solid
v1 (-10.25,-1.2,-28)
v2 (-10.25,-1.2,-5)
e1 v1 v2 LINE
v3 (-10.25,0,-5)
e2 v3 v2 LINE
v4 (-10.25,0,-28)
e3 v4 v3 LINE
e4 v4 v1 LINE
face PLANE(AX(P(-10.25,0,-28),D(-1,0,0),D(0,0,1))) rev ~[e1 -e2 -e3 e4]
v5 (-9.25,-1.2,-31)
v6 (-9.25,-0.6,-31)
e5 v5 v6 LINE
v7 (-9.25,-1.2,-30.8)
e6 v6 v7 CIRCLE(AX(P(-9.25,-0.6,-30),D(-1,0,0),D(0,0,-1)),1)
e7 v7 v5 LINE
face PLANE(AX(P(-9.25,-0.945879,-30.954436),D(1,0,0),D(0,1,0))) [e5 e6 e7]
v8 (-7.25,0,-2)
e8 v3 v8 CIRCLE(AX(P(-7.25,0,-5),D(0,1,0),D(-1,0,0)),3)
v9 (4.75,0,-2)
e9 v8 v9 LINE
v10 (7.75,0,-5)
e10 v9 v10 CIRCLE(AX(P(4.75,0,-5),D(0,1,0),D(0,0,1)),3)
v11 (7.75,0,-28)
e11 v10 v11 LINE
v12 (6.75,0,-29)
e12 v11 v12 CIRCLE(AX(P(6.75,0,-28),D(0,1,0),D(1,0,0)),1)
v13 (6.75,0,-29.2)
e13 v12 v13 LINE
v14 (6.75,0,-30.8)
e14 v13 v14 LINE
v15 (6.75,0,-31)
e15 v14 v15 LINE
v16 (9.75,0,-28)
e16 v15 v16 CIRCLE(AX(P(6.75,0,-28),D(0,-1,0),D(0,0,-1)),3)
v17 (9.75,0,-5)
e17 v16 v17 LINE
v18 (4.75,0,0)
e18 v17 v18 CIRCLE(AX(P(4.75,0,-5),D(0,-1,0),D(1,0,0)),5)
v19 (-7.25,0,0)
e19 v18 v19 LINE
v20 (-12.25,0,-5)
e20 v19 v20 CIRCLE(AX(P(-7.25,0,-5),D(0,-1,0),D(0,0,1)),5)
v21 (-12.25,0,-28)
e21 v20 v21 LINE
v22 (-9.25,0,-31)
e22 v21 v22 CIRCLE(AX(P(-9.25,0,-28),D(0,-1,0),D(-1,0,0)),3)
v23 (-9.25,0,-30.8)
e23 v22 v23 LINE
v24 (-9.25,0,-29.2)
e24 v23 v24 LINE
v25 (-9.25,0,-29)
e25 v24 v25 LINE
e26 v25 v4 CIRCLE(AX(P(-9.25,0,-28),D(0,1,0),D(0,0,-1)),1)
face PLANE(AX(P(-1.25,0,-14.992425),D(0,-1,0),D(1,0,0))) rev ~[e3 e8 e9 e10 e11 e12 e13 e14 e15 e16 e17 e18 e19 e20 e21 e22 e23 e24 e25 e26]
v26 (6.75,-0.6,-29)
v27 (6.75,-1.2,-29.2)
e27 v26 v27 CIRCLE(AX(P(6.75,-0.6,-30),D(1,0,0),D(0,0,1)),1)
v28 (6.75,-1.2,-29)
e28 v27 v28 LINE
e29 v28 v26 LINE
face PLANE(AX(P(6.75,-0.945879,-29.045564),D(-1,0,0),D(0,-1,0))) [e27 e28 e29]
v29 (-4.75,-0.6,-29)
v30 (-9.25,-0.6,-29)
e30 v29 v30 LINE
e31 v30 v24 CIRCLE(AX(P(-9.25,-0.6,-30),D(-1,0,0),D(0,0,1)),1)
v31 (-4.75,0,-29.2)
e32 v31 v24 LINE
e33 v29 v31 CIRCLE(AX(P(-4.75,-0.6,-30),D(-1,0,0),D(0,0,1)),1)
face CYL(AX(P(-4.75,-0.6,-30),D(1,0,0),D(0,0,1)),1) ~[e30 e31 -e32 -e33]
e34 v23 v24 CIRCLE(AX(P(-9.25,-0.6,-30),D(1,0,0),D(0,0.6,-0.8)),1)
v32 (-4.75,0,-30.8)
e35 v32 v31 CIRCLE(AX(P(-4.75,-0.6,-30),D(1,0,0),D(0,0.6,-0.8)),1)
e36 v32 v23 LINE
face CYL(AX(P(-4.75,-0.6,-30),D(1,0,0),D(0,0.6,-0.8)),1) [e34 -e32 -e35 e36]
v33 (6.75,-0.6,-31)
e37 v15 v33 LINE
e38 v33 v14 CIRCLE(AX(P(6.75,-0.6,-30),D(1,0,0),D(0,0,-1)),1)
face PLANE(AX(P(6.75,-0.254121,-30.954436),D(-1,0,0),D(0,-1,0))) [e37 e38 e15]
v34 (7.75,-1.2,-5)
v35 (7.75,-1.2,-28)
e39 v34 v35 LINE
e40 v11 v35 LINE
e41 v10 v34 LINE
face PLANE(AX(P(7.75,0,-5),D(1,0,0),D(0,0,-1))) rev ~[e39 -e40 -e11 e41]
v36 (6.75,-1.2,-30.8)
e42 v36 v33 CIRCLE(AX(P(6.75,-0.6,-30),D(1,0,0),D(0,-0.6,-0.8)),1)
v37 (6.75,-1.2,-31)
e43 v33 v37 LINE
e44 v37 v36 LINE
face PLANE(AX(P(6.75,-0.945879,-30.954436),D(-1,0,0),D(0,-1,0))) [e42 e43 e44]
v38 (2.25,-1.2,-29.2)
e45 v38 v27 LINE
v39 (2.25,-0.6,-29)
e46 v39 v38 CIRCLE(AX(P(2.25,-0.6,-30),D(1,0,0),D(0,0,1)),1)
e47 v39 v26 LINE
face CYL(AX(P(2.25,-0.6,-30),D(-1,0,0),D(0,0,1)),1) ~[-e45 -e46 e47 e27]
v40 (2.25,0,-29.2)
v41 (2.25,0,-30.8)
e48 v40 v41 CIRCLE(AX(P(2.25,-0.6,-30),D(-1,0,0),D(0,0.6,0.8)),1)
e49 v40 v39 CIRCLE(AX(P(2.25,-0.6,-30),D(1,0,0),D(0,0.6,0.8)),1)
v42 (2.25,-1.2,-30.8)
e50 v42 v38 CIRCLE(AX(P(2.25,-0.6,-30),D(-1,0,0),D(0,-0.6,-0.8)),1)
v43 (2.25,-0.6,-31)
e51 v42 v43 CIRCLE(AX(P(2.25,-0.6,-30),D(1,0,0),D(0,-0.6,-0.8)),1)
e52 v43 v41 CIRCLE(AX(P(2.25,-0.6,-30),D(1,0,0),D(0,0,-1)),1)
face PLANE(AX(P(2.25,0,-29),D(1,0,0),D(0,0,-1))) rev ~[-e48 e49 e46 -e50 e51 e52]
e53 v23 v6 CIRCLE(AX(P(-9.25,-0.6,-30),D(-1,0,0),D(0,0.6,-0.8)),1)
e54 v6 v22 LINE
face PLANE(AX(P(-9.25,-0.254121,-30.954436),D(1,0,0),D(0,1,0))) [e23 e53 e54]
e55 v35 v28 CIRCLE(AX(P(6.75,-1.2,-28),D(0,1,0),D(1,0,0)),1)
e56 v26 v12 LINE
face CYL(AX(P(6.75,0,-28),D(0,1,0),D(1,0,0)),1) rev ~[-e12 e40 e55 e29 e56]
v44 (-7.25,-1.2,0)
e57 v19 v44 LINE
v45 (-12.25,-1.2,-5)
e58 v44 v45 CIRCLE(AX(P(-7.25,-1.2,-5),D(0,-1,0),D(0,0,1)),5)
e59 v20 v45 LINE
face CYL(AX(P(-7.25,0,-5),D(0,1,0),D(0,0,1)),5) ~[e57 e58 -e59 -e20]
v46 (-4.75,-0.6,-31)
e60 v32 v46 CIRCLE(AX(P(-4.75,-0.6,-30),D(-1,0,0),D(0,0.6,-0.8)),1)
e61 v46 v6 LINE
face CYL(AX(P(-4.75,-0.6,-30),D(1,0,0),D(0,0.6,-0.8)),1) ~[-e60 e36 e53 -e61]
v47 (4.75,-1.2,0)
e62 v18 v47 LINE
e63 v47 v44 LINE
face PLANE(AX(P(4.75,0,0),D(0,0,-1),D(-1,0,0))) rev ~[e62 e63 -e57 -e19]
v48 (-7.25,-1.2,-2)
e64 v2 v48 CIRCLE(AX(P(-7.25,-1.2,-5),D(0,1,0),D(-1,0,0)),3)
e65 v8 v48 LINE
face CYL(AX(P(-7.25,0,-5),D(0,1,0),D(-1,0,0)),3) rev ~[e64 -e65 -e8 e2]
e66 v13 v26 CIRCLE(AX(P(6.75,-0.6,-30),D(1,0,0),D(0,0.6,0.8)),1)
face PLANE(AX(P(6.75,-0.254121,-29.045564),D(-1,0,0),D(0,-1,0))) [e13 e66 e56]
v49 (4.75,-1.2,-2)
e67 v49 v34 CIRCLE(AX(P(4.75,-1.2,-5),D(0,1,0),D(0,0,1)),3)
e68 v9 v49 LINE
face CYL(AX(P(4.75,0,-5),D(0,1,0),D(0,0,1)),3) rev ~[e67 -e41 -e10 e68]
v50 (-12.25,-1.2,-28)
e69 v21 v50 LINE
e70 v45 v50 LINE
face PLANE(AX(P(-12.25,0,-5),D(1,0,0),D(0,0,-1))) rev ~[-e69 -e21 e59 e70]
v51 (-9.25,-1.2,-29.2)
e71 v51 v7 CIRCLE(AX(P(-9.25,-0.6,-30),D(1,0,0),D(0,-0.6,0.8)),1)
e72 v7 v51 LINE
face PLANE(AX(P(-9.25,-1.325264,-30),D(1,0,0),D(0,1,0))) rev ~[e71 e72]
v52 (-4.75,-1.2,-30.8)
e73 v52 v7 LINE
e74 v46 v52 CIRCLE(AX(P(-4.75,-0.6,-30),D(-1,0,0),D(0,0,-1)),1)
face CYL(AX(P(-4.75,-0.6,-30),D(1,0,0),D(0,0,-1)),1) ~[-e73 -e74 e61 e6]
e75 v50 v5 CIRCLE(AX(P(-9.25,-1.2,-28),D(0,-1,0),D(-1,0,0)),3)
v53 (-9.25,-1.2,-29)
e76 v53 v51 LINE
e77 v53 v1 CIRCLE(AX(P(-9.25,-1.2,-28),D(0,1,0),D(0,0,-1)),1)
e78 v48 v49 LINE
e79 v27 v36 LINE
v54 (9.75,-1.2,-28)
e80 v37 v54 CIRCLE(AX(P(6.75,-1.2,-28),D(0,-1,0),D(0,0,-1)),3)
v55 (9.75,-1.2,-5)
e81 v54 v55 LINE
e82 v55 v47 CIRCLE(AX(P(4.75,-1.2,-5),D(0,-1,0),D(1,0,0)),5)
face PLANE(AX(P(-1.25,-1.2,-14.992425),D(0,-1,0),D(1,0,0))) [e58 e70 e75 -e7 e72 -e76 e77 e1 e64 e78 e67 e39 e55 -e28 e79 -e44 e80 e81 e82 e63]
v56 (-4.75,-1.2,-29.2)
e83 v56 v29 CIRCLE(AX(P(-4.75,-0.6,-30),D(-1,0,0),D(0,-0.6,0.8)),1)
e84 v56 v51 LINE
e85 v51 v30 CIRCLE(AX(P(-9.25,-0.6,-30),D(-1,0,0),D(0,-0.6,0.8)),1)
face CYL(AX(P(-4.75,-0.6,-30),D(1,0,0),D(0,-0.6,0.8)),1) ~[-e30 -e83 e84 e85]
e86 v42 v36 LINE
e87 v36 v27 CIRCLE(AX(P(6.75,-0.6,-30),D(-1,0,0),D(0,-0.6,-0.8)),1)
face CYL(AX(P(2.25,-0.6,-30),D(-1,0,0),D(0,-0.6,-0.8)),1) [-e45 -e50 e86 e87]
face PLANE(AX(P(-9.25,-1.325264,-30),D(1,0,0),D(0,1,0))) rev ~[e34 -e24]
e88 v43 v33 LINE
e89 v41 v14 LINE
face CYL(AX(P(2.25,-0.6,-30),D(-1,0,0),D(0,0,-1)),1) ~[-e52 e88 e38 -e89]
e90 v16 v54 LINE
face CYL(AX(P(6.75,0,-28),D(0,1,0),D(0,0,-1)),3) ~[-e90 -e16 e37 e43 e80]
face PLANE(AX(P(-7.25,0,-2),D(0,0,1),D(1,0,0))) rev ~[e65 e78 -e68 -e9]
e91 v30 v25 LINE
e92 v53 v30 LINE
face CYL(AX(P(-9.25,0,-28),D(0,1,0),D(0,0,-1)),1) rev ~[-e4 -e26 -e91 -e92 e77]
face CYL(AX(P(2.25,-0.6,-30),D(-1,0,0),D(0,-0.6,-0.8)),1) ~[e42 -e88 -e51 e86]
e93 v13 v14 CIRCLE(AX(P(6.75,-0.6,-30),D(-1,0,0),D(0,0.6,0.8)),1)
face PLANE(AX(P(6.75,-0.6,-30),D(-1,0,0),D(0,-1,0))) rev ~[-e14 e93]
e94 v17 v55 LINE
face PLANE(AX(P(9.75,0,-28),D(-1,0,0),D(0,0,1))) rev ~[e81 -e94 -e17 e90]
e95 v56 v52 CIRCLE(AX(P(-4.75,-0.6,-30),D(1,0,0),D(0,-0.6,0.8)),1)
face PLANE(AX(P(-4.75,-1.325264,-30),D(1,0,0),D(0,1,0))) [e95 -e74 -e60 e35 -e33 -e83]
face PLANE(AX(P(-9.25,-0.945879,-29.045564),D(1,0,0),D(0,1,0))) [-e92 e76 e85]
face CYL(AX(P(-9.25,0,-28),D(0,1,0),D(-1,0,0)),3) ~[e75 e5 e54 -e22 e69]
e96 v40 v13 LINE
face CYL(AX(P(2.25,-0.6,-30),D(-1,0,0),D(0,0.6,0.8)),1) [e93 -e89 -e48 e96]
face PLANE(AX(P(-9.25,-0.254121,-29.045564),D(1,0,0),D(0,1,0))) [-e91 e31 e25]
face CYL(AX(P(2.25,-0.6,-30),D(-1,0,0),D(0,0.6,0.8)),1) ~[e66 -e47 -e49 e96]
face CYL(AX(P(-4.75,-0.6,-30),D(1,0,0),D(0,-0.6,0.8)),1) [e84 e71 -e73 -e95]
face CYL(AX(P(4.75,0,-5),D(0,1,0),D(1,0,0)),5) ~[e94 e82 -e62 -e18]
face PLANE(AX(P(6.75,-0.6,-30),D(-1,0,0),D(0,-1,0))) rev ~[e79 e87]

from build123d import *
from build123d import SkipClean  # not in build123d's __all__

# Parameters (mm, degrees)
F1_DEPTH = 1.2
F3_DEPTH = 4.5
F4_DEPTH = 4.5
F6_DEPTH = 4.5
F7_DEPTH = 4.5


with BuildPart() as f1:
    # F0 (on Front) → F1 (new body)
    with BuildSketch(Plane.XZ):
        with BuildLine():
            Line((4.75, 0), (-7.25, 0))
            ThreePointArc((-7.25, 0), (-10.7855339059, -1.4644660941), (-12.25, -5))
            Line((-12.25, -5), (-12.25, -28))
            ThreePointArc((-12.25, -28), (-11.3713203436, -30.1213203436), (-9.25, -31))
            Line((-9.25, -31), (-4.75, -31))
            Line((-4.75, -31), (-4.75, -29))
            Line((-4.75, -29), (-9.25, -29))
            ThreePointArc((-9.25, -29), (-9.9571067812, -28.7071067812), (-10.25, -28))
            Line((-10.25, -28), (-10.25, -5))
            ThreePointArc((-10.25, -5), (-9.3713203436, -2.8786796564), (-7.25, -2))
            Line((-7.25, -2), (4.75, -2))
            ThreePointArc((4.75, -2), (6.8713203436, -2.8786796564), (7.75, -5))
            Line((7.75, -5), (7.75, -28))
            ThreePointArc((7.75, -28), (7.4571067812, -28.7071067812), (6.75, -29))
            Line((6.75, -29), (2.25, -29))
            Line((2.25, -29), (2.25, -31))
            Line((2.25, -31), (6.75, -31))
            ThreePointArc((6.75, -31), (8.8713203436, -30.1213203436), (9.75, -28))
            Line((9.75, -28), (9.75, -5))
            ThreePointArc((9.75, -5), (8.2855339059, -1.4644660941), (4.75, 0))
        make_face()
    extrude(amount=F1_DEPTH)

    # F2 (on face) → F3 (join)
    with BuildSketch(Plane.YZ.offset(-4.75)):
        with BuildLine():
            Line((-1.2, -30.8), (-1.2, -29.2))
            ThreePointArc((-1.2, -29.2), (-1.6, -30), (-1.2, -30.8))
        make_face()
        with BuildLine():
            ThreePointArc((-0.6, -29), (-0.916227766, -29.0513167019), (-1.2, -29.2))
            Line((-1.2, -29.2), (-1.2, -30.8))
            ThreePointArc((-1.2, -30.8), (-0.916227766, -30.9486832981), (-0.6, -31))
            ThreePointArc((-0.6, -31), (-0.283772234, -30.9486832981), (0, -30.8))
            Line((0, -30.8), (0, -29.2))
            ThreePointArc((0, -29.2), (-0.283772234, -29.0513167019), (-0.6, -29))
        make_face()
        with BuildLine():
            ThreePointArc((0.4, -30), (0.294427191, -29.5527864045), (0, -29.2))
            Line((0, -29.2), (0, -30.8))
            ThreePointArc((0, -30.8), (0.294427191, -30.4472135955), (0.4, -30))
        make_face()
    extrude(amount=-F3_DEPTH)

    # F2 (on face) → F4 (cut)
    with BuildSketch(Plane.YZ.offset(-4.75)):
        with BuildLine():
            Line((0, -29), (-0.6, -29))
            ThreePointArc((-0.6, -29), (-0.283772234, -29.0513167019), (0, -29.2))
            Line((0, -29.2), (0, -29))
        make_face()
        with BuildLine():
            Line((-0.6, -29), (-1.2, -29))
            Line((-1.2, -29), (-1.2, -29.2))
            ThreePointArc((-1.2, -29.2), (-0.916227766, -29.0513167019), (-0.6, -29))
        make_face()
        with BuildLine():
            ThreePointArc((0, -30.8), (-0.283772234, -30.9486832981), (-0.6, -31))
            Line((-0.6, -31), (0, -31))
            Line((0, -31), (0, -30.8))
        make_face()
        with BuildLine():
            ThreePointArc((-0.6, -31), (-0.916227766, -30.9486832981), (-1.2, -30.8))
            Line((-1.2, -30.8), (-1.2, -31))
            Line((-1.2, -31), (-0.6, -31))
        make_face()
    with SkipClean():  # cleaning this boolean's faces spoils the solid; the shape is the same uncleaned
        extrude(amount=-F4_DEPTH, mode=Mode.SUBTRACT)

    # F5 (on face) → F6 (join)
    with BuildSketch(Plane(origin=(2.25, 0, 0), x_dir=(0, -1, 0), z_dir=(-1, 0, 0))):
        with BuildLine():
            Line((1.2, -30.8), (1.2, -29.2))
            ThreePointArc((1.2, -29.2), (0.916227766, -29.0513167019), (0.6, -29))
            ThreePointArc((0.6, -29), (0.283772234, -29.0513167019), (0, -29.2))
            Line((0, -29.2), (0, -30.8))
            ThreePointArc((0, -30.8), (0.283772234, -30.9486832981), (0.6, -31))
            ThreePointArc((0.6, -31), (0.916227766, -30.9486832981), (1.2, -30.8))
        make_face()
        with BuildLine():
            Line((0, -30.8), (0, -29.2))
            ThreePointArc((0, -29.2), (-0.4, -30), (0, -30.8))
        make_face()
        with BuildLine():
            ThreePointArc((1.6, -30), (1.494427191, -29.5527864045), (1.2, -29.2))
            Line((1.2, -29.2), (1.2, -30.8))
            ThreePointArc((1.2, -30.8), (1.494427191, -30.4472135955), (1.6, -30))
        make_face()
    extrude(amount=-F6_DEPTH)

    # F5 (on face) → F7 (cut)
    with BuildSketch(Plane(origin=(2.25, 0, 0), x_dir=(0, -1, 0), z_dir=(-1, 0, 0))):
        with BuildLine():
            ThreePointArc((0, -29.2), (0.283772234, -29.0513167019), (0.6, -29))
            Line((0.6, -29), (0, -29))
            Line((0, -29), (0, -29.2))
        make_face()
        with BuildLine():
            Line((1.2, -29.2), (1.2, -29))
            Line((1.2, -29), (0.6, -29))
            ThreePointArc((0.6, -29), (0.916227766, -29.0513167019), (1.2, -29.2))
        make_face()
        with BuildLine():
            Line((0, -31), (0.6, -31))
            ThreePointArc((0.6, -31), (0.283772234, -30.9486832981), (0, -30.8))
            Line((0, -30.8), (0, -31))
        make_face()
        with BuildLine():
            Line((1.2, -31), (1.2, -30.8))
            ThreePointArc((1.2, -30.8), (0.916227766, -30.9486832981), (0.6, -31))
            Line((0.6, -31), (1.2, -31))
        make_face()
    with SkipClean():  # cleaning this boolean's faces spoils the solid; the shape is the same uncleaned
        extrude(amount=-F7_DEPTH, mode=Mode.SUBTRACT)


solid = f1.part
